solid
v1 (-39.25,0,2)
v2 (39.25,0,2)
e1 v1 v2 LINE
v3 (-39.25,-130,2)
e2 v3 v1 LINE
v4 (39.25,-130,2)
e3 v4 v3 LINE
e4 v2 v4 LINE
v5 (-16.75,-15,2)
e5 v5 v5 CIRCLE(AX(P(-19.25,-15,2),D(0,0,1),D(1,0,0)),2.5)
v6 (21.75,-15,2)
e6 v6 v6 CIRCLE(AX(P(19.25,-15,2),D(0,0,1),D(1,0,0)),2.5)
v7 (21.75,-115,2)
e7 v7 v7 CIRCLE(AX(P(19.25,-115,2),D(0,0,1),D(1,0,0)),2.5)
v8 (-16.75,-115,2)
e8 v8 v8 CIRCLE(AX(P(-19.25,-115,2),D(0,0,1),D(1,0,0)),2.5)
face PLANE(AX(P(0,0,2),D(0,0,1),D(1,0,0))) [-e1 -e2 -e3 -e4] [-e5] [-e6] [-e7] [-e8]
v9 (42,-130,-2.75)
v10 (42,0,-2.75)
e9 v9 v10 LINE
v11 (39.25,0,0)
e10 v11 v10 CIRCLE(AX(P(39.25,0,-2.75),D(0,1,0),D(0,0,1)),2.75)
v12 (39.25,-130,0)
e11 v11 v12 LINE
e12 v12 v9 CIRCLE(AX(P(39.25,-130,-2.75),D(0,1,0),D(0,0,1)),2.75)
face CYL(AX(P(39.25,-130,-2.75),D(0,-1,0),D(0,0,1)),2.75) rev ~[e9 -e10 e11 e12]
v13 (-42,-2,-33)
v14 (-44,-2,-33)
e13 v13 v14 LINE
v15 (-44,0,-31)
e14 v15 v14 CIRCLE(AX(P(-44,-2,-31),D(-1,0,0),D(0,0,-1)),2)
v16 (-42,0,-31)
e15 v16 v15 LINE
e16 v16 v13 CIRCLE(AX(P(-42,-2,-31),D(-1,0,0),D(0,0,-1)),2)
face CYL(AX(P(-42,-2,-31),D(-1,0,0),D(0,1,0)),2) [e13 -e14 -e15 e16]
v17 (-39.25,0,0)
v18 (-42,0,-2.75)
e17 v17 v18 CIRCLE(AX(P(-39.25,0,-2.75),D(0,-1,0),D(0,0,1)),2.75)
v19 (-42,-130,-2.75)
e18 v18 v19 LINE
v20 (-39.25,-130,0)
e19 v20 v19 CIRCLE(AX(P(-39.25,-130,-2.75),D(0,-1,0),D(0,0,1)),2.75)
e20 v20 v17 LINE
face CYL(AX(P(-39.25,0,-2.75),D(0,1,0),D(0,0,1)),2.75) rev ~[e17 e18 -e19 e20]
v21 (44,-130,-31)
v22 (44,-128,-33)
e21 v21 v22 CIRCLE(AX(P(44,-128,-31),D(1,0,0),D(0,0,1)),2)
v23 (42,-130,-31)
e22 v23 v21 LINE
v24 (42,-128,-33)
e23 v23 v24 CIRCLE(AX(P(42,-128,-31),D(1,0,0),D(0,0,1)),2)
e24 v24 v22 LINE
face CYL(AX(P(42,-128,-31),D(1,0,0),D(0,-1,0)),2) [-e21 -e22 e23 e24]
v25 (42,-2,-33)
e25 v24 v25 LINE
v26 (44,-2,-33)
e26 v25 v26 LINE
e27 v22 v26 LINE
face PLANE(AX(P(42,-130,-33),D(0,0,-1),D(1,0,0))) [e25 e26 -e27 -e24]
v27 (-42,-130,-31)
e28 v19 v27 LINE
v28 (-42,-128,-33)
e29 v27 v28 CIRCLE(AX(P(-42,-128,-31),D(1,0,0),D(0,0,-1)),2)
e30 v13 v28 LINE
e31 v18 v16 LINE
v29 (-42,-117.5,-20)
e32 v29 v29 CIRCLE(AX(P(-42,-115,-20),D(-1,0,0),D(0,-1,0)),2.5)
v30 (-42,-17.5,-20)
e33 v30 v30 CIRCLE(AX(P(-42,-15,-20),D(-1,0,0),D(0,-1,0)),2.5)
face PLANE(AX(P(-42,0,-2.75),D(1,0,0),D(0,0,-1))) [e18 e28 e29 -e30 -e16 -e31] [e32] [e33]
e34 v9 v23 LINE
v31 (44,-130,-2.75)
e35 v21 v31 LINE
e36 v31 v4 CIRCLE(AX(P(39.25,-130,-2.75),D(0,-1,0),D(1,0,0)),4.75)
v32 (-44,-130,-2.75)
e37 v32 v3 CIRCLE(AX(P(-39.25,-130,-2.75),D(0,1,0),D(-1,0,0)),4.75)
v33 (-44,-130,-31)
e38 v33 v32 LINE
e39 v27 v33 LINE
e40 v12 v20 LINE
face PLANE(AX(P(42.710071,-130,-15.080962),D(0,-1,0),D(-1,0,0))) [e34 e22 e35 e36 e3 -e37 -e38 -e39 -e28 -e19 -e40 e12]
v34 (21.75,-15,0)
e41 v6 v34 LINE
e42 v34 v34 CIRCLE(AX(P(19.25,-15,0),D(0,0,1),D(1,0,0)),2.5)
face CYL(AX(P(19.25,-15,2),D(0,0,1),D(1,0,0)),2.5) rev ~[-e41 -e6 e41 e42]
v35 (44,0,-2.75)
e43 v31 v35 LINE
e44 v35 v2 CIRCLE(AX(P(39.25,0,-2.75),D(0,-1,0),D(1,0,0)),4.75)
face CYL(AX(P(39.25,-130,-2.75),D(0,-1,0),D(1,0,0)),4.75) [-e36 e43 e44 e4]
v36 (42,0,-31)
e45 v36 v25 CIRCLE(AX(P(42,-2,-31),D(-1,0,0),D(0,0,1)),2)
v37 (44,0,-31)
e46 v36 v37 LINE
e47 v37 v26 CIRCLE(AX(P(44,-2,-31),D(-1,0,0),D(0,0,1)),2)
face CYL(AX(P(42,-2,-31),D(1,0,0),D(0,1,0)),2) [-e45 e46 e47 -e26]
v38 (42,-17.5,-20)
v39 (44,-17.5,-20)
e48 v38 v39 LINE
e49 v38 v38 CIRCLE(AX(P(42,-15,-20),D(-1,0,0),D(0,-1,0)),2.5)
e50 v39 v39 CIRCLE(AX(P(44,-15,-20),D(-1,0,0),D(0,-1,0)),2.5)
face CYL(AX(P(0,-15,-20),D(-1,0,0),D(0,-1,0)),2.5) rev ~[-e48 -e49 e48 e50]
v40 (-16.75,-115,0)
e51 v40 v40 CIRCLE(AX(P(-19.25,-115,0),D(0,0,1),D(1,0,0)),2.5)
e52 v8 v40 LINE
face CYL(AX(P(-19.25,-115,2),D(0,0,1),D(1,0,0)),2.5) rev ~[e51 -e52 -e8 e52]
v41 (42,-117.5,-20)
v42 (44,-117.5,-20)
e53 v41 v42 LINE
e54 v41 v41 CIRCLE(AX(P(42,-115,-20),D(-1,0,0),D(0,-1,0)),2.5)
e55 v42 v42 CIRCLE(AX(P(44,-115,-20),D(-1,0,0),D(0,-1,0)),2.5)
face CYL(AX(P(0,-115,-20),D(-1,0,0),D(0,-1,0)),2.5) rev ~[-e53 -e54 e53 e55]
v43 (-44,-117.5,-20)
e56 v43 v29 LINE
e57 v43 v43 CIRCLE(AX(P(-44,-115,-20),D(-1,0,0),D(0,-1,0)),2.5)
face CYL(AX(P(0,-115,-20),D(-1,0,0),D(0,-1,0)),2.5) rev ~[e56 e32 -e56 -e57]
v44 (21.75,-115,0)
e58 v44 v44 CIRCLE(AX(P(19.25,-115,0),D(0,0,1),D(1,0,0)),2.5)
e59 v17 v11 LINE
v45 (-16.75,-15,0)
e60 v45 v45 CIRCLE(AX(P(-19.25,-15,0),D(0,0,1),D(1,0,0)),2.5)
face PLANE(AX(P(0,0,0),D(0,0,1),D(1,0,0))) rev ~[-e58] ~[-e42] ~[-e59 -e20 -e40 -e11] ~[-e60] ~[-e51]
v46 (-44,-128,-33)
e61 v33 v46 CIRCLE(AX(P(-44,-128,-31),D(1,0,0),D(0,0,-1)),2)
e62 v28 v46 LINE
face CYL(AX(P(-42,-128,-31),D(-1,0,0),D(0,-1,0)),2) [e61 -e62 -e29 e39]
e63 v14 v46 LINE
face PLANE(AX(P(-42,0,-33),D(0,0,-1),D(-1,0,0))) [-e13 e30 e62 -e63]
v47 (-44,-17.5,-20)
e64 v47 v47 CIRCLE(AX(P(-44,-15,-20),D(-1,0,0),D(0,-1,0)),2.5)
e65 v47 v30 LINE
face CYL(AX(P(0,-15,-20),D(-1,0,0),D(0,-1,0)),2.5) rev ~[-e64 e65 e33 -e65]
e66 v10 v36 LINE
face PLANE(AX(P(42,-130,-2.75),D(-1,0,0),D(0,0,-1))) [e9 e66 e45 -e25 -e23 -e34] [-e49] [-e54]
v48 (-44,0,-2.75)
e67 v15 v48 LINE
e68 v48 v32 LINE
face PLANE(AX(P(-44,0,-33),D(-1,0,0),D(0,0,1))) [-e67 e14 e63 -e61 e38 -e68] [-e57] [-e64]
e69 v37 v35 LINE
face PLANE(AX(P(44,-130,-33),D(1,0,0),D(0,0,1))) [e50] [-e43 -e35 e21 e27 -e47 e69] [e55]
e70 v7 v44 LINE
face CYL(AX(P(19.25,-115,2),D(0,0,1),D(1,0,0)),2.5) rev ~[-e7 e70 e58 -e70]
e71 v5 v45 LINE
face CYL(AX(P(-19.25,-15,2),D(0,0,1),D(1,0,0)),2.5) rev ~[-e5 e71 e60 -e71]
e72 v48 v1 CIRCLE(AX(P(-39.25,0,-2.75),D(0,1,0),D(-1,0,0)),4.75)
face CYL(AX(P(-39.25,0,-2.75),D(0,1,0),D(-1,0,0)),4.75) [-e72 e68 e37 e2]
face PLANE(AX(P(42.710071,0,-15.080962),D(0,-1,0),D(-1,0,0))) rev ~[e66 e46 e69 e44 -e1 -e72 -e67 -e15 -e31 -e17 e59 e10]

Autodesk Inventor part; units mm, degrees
ref_plane "YZ Plane" through (0, 0, 0) normal (1, 0, 0) x (0, 1, 0)
ref_plane "XZ Plane" through (0, 0, 0) normal (0, 1, 0) x (-1, 0, 0)
ref_plane "XY Plane" through (0, 0, 0) normal (0, 0, 1) x (1, 0, 0)
sketch "Sketch1" plane through (0, 0, 0) normal (0, 0, 1) x (1, 0, 0)
  line L0 (-42, 0) -> (42, 0)
  line L1 (42, 0) -> (42, -130)
  line L2 (42, -130) -> (-42, -130)
  line L3 (-42, -130) -> (-42, 0)
  point P0 (0, 0)
  point P1 (0, 0)
  dimension "d0" = 84
  dimension "d1" = 130
extrude "Plate1" add sketch "Sketch1" along normal blind 2
sketch "Sketch2" plane through (42, -130, 0) normal (1, 0, 0) x (0, 1, 0)
  line L0 (130, 0) -> (0, 0)
  line L1 (0, 0) -> (0, -33)
  line L2 (0, -33) -> (130, -33)
  line L3 (130, -33) -> (130, 0)
edge flange "Flange1" height 35 angle 90 thickness 2 bend radius 2.75 thickness toward (1, 0, 0) relief round relief width 2 relief depth 1 corner gap 2.75 corner form 0 edges at (42, -65, 0) (-42, -65, 0) wall of the first edge with corners at (42, 0, 0) (42, -130, 0) (42, -130, -33) (42, 0, -33)
bend "Bend1"
corner "Corner1"
sketch "Sketch3" plane through (0, 0, 0) normal (1, 0, 0) x (0, 1, 0)
  line L0 (0, -33) -> (-130, -33) projected
  line L1 (-115, -20) -> (-115, -20) construction
  line L2 (-117.5, -20) -> (-117.5, -20)
  line L3 (-112.5, -20) -> (-112.5, -20)
  arc A0 (-112.5, -20) -> (-117.5, -20) centre (-115, -20) ccw
  arc A1 (-117.5, -20) -> (-112.5, -20) centre (-115, -20) ccw
  line L4 (-130, -2.75) -> (-130, -33) projected
  point P0 (0, 0)
  point P1 (-115, -20)
  dimension "d14" = 0
  dimension "d15" = 13
  dimension "d17" = 2.5
  dimension "d18" = 15
extrude "Extrusion1" cut sketch "Sketch3" along normal through all both and the other way through all
sketch "Sketch6" plane through (0, 0, 2) normal (0, 0, 1) x (1, 0, 0)
  line L0 (-39.25, 0) -> (39.25, 0) projected
  circle A0 centre (19.25, -115) radius 2.5
  line L1 (44, -112.5) -> (44, -117.5) projected
  circle A1 centre (-19.25, -115) radius 2.5
  line L2 (39.25, -130) -> (39.25, 0) projected
  line L3 (0, 0) -> (0, -130) construction
  line L4 (-39.25, -130) -> (39.25, -130) projected
  point P0 (0, 0)
  point P1 (44, -115)
  dimension "d27" = 5
  dimension "d33" = 20
extrude "Extrusion3" cut sketch "Sketch6" against normal blind 10
fillet "Fillet1" radius 2 4 edges at (43, 0, -33) (-43, 0, -33) (43, -130, -33) (-43, -130, -33)
pattern_linear "Rectangular Pattern2" count 2 spacing 100 along (0, 1, 0) of "Extrusion1", "Extrusion3"
equation "\"d2\" = Thickness"
equation "\"d3\" = BendReliefWidth"
equation "\"d4\" = BendReliefDepth"
equation "\"d5\" = MinimumRemnant"
equation "\"d6\" = TransitionRadius"
equation "\"d9\" = BendRadius"
equation "\"d10\" = CornerReliefSize"
equation "\"d11\" = GapSize"
equation "\"d12\" = JacobiRadiusSize"
equation "\"BendReliefWidth\" = Thickness"
equation "\"BendReliefDepth\" = 0.5 * Thickness"
equation "\"CornerReliefSize\" = 4 * Thickness"
equation "\"MinimumRemnant\" = 2 * Thickness"
equation "\"TransitionRadius\" = BendRadius"
equation "\"JacobiRadiusSize\" = BendRadius"
equation "\"GapSize\" = Thickness"
equation "\"Thickness\" = 2"
equation "\"BendRadius\" = 2.75"
properties part number "NDM 11.029 bracket 29" material "Stainless Steel"
